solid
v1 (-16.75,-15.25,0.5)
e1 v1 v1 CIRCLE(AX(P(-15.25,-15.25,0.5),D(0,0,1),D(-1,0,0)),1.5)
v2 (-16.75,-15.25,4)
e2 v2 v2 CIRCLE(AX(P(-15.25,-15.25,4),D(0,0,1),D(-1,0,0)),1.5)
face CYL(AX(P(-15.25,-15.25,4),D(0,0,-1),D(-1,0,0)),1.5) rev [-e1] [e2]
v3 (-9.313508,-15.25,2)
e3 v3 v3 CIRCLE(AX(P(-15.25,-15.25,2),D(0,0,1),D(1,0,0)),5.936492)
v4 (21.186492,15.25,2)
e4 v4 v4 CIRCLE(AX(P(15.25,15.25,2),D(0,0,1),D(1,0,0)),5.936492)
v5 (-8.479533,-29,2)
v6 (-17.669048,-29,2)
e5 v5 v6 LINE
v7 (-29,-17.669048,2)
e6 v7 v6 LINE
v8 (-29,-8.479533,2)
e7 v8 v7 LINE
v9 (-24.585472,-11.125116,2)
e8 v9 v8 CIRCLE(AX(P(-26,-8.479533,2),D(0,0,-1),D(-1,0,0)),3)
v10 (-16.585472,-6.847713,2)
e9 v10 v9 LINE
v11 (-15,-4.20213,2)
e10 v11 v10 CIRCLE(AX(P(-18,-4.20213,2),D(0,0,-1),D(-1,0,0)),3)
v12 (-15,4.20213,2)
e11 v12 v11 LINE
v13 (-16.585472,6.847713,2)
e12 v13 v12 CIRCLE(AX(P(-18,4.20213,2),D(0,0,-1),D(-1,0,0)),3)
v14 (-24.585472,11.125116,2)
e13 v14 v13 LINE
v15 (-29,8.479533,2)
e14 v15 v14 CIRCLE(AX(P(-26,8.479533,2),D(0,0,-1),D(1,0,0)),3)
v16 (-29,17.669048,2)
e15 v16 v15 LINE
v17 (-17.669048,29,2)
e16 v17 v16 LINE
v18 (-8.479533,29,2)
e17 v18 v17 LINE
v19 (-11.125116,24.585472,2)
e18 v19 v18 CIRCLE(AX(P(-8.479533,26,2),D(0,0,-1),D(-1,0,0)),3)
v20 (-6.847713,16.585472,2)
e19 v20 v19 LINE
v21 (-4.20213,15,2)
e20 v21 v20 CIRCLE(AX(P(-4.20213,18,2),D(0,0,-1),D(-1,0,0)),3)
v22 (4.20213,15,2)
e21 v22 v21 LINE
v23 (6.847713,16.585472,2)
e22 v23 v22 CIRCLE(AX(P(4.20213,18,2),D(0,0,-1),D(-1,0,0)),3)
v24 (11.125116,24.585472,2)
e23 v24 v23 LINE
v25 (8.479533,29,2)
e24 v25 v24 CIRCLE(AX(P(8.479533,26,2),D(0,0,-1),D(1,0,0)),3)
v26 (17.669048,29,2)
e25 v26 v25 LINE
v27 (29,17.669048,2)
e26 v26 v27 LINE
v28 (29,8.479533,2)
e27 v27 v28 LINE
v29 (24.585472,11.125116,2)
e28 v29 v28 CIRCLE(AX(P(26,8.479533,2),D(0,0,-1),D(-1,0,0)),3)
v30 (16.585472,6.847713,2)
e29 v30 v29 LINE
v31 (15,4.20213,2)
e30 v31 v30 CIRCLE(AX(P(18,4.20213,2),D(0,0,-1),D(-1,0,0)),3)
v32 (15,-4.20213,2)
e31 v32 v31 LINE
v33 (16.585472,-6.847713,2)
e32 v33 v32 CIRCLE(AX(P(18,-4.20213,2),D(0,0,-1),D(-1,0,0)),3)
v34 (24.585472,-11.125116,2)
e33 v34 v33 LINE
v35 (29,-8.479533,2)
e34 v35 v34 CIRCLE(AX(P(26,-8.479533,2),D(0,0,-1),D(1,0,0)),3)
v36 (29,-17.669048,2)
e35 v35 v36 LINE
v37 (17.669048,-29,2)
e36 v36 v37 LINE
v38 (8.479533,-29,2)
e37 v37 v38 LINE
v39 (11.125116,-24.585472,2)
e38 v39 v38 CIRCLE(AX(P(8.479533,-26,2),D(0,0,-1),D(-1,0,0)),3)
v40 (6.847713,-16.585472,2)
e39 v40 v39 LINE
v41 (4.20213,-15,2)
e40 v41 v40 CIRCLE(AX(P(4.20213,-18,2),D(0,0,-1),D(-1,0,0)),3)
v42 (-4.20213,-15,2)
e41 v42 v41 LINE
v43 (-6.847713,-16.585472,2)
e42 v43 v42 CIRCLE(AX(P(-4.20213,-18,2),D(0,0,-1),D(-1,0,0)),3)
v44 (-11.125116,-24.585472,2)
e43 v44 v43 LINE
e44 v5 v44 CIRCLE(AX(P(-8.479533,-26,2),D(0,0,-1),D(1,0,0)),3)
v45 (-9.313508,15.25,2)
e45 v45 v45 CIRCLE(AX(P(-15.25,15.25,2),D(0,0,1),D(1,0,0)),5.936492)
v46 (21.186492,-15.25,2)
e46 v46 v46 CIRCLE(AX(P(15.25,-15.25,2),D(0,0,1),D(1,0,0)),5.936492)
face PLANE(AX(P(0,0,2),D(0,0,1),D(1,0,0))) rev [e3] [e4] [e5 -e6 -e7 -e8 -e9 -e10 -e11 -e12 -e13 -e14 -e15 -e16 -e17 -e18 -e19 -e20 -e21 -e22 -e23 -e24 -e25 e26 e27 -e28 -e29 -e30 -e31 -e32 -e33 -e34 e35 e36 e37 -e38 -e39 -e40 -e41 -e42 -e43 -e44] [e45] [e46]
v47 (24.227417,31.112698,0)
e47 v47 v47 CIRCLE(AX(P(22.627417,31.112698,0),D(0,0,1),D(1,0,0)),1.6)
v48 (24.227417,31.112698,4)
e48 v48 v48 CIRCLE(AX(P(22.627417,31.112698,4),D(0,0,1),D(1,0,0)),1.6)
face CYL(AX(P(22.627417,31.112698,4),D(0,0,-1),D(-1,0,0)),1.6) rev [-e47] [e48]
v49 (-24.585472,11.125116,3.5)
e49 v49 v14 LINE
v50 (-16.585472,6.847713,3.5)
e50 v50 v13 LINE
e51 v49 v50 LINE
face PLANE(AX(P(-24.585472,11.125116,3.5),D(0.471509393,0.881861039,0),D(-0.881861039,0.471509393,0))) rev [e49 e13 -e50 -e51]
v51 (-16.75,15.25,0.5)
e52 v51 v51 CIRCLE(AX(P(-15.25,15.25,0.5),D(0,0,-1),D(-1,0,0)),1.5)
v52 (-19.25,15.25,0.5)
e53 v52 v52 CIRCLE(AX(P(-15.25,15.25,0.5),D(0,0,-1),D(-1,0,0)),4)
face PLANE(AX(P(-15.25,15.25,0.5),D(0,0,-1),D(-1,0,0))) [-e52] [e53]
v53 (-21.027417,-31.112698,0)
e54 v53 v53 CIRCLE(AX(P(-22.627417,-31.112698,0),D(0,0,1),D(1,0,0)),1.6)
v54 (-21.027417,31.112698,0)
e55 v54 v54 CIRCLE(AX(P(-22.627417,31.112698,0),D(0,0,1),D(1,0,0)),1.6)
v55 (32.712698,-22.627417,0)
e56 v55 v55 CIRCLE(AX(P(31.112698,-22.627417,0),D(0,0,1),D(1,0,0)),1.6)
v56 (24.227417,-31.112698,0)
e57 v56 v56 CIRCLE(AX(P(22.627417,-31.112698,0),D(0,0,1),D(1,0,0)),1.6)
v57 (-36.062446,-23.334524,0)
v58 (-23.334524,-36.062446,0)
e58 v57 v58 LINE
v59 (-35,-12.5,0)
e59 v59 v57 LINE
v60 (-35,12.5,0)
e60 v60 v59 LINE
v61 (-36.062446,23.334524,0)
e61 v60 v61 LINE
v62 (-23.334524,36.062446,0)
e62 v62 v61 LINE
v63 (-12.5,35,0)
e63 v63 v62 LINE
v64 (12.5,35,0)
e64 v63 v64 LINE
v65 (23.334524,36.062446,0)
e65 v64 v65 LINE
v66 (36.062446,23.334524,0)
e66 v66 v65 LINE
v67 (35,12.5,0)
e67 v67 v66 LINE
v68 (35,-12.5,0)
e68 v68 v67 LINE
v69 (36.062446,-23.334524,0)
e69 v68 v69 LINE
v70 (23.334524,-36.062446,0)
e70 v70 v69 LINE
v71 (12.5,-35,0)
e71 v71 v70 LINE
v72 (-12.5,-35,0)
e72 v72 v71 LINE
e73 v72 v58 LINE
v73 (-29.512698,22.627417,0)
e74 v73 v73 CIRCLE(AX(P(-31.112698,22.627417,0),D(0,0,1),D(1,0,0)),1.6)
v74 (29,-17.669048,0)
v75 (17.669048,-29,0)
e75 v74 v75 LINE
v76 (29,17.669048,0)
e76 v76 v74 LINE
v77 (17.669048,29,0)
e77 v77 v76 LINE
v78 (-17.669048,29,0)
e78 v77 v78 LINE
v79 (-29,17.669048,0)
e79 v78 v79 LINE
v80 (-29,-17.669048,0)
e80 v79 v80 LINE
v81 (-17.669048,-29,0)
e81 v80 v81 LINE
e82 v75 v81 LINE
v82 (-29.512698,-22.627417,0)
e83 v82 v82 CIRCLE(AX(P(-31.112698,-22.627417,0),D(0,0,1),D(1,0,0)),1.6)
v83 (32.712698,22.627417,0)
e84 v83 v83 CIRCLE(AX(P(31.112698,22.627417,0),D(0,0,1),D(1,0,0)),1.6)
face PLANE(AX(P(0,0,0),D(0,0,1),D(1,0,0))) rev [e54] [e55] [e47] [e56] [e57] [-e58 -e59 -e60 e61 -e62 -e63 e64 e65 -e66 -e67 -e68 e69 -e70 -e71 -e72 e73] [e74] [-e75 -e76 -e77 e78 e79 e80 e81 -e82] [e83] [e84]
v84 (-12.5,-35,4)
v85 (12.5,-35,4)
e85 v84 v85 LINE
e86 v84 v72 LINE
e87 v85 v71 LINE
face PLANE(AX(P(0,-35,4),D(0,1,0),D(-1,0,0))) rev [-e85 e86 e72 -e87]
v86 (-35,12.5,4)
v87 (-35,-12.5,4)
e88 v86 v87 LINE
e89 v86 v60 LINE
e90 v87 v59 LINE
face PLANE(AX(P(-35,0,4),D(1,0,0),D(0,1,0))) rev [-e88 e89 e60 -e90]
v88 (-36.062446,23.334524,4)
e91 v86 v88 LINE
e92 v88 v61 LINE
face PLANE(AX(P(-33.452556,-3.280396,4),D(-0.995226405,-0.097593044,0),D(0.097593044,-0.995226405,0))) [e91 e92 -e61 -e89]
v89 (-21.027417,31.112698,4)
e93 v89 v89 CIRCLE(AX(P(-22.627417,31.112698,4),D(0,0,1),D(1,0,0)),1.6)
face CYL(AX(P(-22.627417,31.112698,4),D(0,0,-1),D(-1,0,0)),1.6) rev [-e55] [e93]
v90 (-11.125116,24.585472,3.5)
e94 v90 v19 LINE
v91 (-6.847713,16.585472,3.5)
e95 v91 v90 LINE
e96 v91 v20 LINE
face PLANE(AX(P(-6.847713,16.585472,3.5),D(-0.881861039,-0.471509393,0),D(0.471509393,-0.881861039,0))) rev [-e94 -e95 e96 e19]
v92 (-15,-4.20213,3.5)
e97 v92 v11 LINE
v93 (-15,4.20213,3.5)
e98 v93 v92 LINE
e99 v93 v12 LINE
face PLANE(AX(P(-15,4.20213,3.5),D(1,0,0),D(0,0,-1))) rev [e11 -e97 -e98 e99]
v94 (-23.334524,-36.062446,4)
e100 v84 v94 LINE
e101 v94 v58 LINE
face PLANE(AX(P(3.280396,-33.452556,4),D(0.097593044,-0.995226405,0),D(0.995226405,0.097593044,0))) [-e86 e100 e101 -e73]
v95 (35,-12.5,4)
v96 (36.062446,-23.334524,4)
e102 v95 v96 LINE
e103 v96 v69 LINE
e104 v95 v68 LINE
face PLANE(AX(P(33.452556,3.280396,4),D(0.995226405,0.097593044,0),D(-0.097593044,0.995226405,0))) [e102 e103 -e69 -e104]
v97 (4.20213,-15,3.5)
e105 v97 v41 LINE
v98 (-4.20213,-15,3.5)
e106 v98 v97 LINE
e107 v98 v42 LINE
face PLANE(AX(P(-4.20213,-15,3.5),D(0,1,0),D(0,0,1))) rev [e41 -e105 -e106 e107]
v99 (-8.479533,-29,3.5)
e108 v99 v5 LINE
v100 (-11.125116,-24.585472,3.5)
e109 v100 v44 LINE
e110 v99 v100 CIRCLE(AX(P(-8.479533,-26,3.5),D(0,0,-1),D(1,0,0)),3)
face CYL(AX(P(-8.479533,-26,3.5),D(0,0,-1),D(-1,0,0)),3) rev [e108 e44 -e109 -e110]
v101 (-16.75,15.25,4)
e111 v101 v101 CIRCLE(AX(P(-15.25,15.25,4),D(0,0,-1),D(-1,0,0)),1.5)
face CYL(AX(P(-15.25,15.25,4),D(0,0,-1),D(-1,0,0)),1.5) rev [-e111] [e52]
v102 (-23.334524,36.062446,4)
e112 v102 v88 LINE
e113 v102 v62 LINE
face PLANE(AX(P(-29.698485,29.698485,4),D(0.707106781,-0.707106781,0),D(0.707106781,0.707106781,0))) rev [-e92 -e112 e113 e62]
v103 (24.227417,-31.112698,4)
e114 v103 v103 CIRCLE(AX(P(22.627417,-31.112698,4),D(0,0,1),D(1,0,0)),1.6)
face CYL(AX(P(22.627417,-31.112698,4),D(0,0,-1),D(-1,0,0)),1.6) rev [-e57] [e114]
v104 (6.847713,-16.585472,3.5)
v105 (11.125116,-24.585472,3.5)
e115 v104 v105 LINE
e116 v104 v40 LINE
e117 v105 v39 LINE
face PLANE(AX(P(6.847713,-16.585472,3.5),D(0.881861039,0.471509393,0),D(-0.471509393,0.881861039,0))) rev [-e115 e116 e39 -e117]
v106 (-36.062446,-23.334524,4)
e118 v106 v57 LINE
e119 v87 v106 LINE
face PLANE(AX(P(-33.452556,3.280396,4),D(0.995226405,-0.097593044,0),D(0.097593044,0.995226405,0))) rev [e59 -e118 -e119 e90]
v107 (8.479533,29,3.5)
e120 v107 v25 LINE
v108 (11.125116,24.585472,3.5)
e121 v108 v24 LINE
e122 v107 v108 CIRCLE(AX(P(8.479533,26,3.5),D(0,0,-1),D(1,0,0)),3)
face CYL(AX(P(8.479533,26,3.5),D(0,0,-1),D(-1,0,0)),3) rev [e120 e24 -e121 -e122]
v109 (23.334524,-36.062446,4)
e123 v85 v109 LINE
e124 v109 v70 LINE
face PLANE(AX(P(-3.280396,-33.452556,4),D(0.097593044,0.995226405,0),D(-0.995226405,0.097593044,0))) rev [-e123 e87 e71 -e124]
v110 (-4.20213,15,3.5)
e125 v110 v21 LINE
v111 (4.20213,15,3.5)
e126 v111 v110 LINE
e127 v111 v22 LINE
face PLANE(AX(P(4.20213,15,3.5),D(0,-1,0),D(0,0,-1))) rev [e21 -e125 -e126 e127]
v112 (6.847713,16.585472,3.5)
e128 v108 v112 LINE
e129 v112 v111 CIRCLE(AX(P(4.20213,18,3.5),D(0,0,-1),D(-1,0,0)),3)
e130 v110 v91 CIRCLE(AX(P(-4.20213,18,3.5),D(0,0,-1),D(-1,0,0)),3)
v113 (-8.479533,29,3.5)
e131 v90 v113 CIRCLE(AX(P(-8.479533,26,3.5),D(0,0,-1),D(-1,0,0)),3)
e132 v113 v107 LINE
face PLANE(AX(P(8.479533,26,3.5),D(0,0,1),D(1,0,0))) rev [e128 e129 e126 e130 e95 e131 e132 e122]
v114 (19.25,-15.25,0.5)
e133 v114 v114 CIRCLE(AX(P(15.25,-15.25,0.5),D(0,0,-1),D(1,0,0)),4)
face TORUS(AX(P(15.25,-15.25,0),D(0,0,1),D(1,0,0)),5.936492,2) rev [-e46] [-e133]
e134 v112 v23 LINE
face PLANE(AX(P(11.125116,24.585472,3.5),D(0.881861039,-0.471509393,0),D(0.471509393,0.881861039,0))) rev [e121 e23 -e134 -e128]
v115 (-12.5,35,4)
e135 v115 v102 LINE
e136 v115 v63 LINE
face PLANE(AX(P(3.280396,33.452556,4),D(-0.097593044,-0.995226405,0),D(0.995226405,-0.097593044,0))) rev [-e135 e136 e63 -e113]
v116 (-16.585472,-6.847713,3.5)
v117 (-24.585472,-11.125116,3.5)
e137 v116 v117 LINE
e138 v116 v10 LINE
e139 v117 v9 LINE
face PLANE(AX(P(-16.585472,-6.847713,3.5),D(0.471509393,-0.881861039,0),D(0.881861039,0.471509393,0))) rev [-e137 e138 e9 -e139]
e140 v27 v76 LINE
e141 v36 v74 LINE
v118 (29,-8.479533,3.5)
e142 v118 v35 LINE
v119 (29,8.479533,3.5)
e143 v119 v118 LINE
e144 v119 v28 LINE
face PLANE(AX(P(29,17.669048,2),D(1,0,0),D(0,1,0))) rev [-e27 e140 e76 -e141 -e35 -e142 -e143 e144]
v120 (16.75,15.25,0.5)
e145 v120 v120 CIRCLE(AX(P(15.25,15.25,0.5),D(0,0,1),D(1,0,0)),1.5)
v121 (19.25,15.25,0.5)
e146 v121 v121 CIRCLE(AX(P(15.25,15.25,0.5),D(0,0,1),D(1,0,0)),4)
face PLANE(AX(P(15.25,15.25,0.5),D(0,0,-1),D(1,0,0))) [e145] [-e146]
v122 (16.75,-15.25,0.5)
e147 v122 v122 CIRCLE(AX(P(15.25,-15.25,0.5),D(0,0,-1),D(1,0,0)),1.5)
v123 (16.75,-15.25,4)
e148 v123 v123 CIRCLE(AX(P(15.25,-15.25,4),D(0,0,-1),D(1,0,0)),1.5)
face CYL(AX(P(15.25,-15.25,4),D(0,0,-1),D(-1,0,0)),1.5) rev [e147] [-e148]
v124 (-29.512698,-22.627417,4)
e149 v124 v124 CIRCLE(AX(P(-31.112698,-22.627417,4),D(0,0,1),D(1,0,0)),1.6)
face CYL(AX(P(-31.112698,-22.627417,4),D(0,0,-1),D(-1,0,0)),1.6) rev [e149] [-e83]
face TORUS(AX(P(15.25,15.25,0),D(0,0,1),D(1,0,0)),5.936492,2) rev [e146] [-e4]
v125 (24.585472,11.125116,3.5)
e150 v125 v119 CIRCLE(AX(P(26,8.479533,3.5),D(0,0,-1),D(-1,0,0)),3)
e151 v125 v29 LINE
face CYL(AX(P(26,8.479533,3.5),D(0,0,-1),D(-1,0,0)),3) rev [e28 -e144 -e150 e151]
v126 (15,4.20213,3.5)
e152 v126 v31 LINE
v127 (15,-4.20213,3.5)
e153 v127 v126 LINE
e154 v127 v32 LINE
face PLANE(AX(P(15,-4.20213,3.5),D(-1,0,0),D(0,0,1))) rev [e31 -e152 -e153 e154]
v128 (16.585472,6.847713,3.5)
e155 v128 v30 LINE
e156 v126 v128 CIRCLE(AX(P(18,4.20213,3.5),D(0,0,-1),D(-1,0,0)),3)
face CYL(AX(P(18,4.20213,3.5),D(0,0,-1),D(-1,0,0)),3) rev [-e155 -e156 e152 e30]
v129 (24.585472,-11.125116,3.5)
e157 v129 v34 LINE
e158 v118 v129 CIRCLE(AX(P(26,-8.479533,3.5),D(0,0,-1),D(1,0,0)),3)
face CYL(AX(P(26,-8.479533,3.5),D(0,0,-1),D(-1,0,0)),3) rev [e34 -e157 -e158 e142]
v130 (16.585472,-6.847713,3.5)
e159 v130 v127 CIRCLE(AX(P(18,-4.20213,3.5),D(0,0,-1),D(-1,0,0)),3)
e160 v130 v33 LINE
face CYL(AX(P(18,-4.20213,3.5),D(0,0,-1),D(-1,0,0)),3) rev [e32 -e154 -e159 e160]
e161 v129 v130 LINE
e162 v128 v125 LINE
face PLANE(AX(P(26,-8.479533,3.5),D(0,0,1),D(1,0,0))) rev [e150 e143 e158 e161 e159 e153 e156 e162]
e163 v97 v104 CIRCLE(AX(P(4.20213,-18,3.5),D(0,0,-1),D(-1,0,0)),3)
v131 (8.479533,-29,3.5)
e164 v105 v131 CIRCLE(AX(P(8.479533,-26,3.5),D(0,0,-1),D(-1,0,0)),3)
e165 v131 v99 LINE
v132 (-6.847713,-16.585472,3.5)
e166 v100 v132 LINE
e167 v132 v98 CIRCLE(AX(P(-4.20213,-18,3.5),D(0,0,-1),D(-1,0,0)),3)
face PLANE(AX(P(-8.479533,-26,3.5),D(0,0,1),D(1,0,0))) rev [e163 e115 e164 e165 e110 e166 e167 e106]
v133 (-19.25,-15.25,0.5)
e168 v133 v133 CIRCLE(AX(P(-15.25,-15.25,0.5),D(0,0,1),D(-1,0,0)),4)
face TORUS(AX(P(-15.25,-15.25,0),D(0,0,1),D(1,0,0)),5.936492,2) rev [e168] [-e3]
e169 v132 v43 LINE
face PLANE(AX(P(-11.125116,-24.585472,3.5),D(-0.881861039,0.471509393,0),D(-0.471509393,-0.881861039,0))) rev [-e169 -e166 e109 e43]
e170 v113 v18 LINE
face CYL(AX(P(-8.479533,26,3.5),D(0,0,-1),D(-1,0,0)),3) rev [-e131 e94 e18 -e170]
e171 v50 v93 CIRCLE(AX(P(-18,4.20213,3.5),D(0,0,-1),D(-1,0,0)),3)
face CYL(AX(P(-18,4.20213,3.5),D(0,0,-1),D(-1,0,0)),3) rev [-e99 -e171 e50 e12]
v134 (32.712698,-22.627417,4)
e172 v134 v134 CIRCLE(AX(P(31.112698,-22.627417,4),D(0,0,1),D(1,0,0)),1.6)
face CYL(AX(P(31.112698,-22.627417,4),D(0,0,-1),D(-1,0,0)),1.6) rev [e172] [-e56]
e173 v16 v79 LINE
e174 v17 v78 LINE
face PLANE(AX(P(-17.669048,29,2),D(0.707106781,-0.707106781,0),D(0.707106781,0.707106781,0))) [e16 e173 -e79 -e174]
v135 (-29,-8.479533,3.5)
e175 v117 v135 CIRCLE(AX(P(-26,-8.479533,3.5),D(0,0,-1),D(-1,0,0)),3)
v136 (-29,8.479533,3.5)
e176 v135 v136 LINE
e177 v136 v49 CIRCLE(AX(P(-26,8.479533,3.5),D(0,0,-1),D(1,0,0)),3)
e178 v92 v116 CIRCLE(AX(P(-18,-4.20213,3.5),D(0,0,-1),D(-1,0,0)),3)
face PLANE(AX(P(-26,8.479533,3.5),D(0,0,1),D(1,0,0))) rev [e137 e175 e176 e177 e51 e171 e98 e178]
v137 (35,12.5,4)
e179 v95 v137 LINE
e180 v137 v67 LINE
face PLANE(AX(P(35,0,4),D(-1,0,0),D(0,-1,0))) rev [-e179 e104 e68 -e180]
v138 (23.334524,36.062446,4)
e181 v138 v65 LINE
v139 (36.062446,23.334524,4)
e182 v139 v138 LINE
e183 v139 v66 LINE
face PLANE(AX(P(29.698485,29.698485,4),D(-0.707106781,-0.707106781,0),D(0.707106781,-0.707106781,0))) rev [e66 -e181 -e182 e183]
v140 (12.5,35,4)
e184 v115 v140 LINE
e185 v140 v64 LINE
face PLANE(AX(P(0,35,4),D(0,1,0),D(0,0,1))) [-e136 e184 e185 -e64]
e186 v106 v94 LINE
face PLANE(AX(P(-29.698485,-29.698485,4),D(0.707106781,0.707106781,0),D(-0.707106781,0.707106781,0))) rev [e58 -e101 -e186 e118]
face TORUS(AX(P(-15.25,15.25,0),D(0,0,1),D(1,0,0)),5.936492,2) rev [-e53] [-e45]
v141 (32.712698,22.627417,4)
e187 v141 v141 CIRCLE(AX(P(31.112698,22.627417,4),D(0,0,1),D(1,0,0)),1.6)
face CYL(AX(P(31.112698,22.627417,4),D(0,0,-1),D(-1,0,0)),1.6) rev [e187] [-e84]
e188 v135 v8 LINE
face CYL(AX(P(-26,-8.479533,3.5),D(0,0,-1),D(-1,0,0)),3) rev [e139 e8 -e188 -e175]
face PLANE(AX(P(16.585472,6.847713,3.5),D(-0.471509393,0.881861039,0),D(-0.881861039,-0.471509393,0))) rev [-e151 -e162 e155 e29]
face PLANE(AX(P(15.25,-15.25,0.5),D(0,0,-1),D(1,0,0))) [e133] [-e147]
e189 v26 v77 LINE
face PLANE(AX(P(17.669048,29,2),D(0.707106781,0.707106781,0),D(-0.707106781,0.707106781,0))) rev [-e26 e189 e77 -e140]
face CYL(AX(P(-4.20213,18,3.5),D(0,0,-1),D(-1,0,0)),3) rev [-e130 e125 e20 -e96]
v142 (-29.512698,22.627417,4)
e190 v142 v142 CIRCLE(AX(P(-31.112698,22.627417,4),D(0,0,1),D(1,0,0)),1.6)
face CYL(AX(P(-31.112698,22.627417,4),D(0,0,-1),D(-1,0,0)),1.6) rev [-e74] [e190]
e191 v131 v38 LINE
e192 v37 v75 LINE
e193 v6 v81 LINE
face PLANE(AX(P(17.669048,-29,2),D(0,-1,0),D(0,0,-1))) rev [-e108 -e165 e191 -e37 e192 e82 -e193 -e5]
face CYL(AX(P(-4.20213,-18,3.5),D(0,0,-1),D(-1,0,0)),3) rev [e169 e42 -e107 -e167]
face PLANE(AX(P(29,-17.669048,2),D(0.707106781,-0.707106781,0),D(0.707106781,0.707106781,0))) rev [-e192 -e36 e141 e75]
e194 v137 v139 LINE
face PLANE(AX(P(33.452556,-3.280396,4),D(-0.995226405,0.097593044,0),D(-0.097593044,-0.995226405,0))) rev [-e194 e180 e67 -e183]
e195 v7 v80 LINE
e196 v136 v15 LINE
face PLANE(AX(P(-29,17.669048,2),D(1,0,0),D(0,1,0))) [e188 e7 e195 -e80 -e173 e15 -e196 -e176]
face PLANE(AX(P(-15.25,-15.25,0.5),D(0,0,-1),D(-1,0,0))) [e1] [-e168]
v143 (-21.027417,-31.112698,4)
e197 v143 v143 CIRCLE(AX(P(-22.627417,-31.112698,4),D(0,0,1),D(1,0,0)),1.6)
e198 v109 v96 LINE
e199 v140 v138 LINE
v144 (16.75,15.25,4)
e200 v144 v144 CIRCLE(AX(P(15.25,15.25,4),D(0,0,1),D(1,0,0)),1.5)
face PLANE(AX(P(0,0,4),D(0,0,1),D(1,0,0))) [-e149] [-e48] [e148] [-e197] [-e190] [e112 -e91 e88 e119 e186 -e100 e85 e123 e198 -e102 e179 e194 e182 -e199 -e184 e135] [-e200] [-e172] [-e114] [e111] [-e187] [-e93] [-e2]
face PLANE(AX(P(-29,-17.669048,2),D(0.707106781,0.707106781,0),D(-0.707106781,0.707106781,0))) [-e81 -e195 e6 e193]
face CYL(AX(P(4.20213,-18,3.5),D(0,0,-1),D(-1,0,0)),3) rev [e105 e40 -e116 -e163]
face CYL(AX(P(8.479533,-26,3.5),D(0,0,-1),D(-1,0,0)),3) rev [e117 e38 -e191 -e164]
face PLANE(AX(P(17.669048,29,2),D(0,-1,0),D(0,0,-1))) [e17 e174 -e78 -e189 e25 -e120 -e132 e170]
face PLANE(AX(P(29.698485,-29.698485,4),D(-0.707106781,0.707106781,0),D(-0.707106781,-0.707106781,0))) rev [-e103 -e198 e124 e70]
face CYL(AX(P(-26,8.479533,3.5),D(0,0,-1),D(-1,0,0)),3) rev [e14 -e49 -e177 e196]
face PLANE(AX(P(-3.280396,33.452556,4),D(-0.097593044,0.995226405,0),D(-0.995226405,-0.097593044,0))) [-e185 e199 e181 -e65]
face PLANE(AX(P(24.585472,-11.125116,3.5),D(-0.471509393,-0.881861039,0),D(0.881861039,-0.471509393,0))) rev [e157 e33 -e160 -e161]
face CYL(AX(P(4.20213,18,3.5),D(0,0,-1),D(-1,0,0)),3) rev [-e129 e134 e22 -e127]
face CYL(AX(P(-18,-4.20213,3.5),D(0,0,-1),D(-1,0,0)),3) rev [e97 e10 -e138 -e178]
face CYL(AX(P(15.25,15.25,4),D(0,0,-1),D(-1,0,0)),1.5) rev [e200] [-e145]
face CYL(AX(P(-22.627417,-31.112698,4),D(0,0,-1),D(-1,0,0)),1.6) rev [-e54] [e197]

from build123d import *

# Parameters (mm, degrees)
SKETCH1_R            = 1.6
BOSS_EXTRUDE1_DEPTH  = 4
CUT_EXTRUDE1_DEPTH   = 2
CUT_EXTRUDE2_DEPTH   = 1.5
SKETCH4_R            = 1.5
CUT_EXTRUDE3_DEPTH   = 52.039200621
BOSS_EXTRUDE2_START  = 1.5
SKETCH5_R            = 4
SKETCH5_R_2          = 1.5
BOSS_EXTRUDE2_DEPTH  = 1.5
FILLET1_R            = 2
FILLET1_OF_MIRROR1_R = 2
MIRROR2_3_OUTLINE_W  = 1.5
MIRROR2_3_OUTLINE_H  = 2
MIRROR2_4_OUTLINE_W  = 1.5
MIRROR2_4_OUTLINE_H  = 2


# Read off the part's stored shape, not the designer's step: Mirror2
with BuildPart() as part:
    # Sketch1 → Boss-Extrude1 (new body)
    with BuildSketch(Plane.XY):
        Polygon((-35, 12.5), (-36.062445841, 23.334523779), (-23.334523779, 36.062445841), (-12.5, 35), (12.5, 35), (23.334523779, 36.062445841), (36.062445841, 23.334523779), (35, 12.5), (35, -12.5), (36.062445841, -23.334523779), (23.334523779, -36.062445841), (12.5, -35), (-12.5, -35), (-23.334523779, -36.062445841), (-36.062445841, -23.334523779), (-35, -12.5), align=None)
        with Locations((-22.627416998, 31.112698372)):
            Circle(SKETCH1_R, mode=Mode.SUBTRACT)
        with Locations((-31.112698372, 22.627416998)):
            Circle(SKETCH1_R, mode=Mode.SUBTRACT)
        with Locations((-31.112698372, -22.627416998)):
            Circle(SKETCH1_R, mode=Mode.SUBTRACT)
        with Locations((-22.627416998, -31.112698372)):
            Circle(SKETCH1_R, mode=Mode.SUBTRACT)
        with Locations((22.627416998, -31.112698372)):
            Circle(SKETCH1_R, mode=Mode.SUBTRACT)
        with Locations((31.112698372, -22.627416998)):
            Circle(SKETCH1_R, mode=Mode.SUBTRACT)
        with Locations((31.112698372, 22.627416998)):
            Circle(SKETCH1_R, mode=Mode.SUBTRACT)
        with Locations((22.627416998, 31.112698372)):
            Circle(SKETCH1_R, mode=Mode.SUBTRACT)
    extrude(amount=BOSS_EXTRUDE1_DEPTH)

    # Sketch2 → Cut-Extrude1 (cut)
    with BuildSketch(Plane(origin=(0, 0, 0), x_dir=(-1, 0, 0), z_dir=(0, 0, -1))):
        Polygon((-17.669047558, 29), (17.669047558, 29), (29, 17.669047558), (29, -17.669047558), (17.669047558, -29), (-17.669047558, -29), (-29, -17.669047558), (-29, 17.669047558), align=None)
    extrude(amount=-CUT_EXTRUDE1_DEPTH, mode=Mode.SUBTRACT)

    # Sketch3 → Cut-Extrude2 (cut)
    with BuildSketch(Plane(origin=(0, 0, 2), x_dir=(-1, 0, 0), z_dir=(0, 0, -1))):
        with BuildLine():
            Line((-24.58547182, -11.125115865), (-16.58547182, -6.847712761))
            ThreePointArc((-16.58547182, -6.847712761), (-15.426715665, -5.744273519), (-15, -4.202129644))
            Line((-15, -4.202129644), (-15, 4.202129644))
            ThreePointArc((-15, 4.202129644), (-15.426715665, 5.744273519), (-16.58547182, 6.847712761))
            Line((-16.58547182, 6.847712761), (-24.58547182, 11.125115865))
            ThreePointArc((-24.58547182, 11.125115865), (-27.542143875, 11.052817083), (-29, 8.479532748))
            Line((-29, 8.479532748), (-29, -8.479532748))
            ThreePointArc((-29, -8.479532748), (-27.542143875, -11.052817083), (-24.58547182, -11.125115865))
        make_face()
        with BuildLine():
            Line((6.847712761, 16.58547182), (11.125115865, 24.58547182))
            ThreePointArc((11.125115865, 24.58547182), (11.052817083, 27.542143875), (8.479532748, 29))
            Line((8.479532748, 29), (-8.479532748, 29))
            ThreePointArc((-8.479532748, 29), (-11.052817083, 27.542143875), (-11.125115865, 24.58547182))
            Line((-11.125115865, 24.58547182), (-6.847712761, 16.58547182))
            ThreePointArc((-6.847712761, 16.58547182), (-5.744273519, 15.426715665), (-4.202129644, 15))
            Line((-4.202129644, 15), (4.202129644, 15))
            ThreePointArc((4.202129644, 15), (5.744273519, 15.426715665), (6.847712761, 16.58547182))
        make_face()
        with BuildLine():
            Line((16.58547182, -6.847712761), (24.58547182, -11.125115865))
            ThreePointArc((24.58547182, -11.125115865), (27.542143875, -11.052817083), (29, -8.479532748))
            Line((29, -8.479532748), (29, 8.479532748))
            ThreePointArc((29, 8.479532748), (27.542143875, 11.052817083), (24.58547182, 11.125115865))
            Line((24.58547182, 11.125115865), (16.58547182, 6.847712761))
            ThreePointArc((16.58547182, 6.847712761), (15.426715665, 5.744273519), (15, 4.202129644))
            Line((15, 4.202129644), (15, -4.202129644))
            ThreePointArc((15, -4.202129644), (15.426715665, -5.744273519), (16.58547182, -6.847712761))
        make_face()
        with BuildLine():
            Line((-6.847712761, -16.58547182), (-11.125115865, -24.58547182))
            ThreePointArc((-11.125115865, -24.58547182), (-11.052817083, -27.542143875), (-8.479532748, -29))
            Line((-8.479532748, -29), (8.479532748, -29))
            ThreePointArc((8.479532748, -29), (11.052817083, -27.542143875), (11.125115865, -24.58547182))
            Line((11.125115865, -24.58547182), (6.847712761, -16.58547182))
            ThreePointArc((6.847712761, -16.58547182), (5.744273519, -15.426715665), (4.202129644, -15))
            Line((4.202129644, -15), (-4.202129644, -15))
            ThreePointArc((-4.202129644, -15), (-5.744273519, -15.426715665), (-6.847712761, -16.58547182))
        make_face()
    extrude(amount=-CUT_EXTRUDE2_DEPTH, mode=Mode.SUBTRACT)

    # Sketch4 → Cut-Extrude3 (cut, through all)
    with BuildSketch(Plane(origin=(0, 0, 2), x_dir=(-1, 0, 0), z_dir=(0, 0, -1))):
        with Locations((15.25, 15.25)):
            Circle(SKETCH4_R)
    cut_extrude3 = extrude(amount=-CUT_EXTRUDE3_DEPTH, mode=Mode.SUBTRACT)

    # Sketch5 → Boss-Extrude2 (add)
    with BuildSketch(Plane(origin=(0, 0, 2), x_dir=(-1, 0, 0), z_dir=(0, 0, -1)).offset(BOSS_EXTRUDE2_START)):
        with Locations(Location((15.25, 15.25, 0), (0, 0, 180))):
            Circle(SKETCH5_R)
        with Locations((15.25, 15.25)):
            Circle(SKETCH5_R_2, mode=Mode.SUBTRACT)
    boss_extrude2 = extrude(amount=-BOSS_EXTRUDE2_DEPTH)

    # Fillet1
    # the kernel refuses this fillet: 2 mm, written as the material it adds along each edge
    with BuildSketch(Plane(origin=(-15.25, 15.25, 2), x_dir=(1, 0, 0), z_dir=(0, 1, 0))) as fillet1_piece_1:
        with BuildLine():
            CenterArc((5.936491673, 2), FILLET1_R, 194.477512186, 75.522487814)
            Line((5.936491673, 0), (5.936491673, -0.04))
            Line((5.936491673, -0.04), (4, -0.04))
            Line((4, -0.04), (3.96, 0))
            ThreePointArc((3.96, 0), (3.96, 0.75), (3.961270167, 1.49))
            Line((3.961270167, 1.49), (4, 1.5))
        make_face()
    revolve(axis=Axis((-15.25, 15.25, 2), (0, 0, -1)))

    # Mirror1: Cut-Extrude3, Boss-Extrude2 across plane
    add(cut_extrude3.mirror(Plane(origin=(0, 0, 0), x_dir=(0, 0, 1), z_dir=(1, 0, 0))), mode=Mode.SUBTRACT)
    add(boss_extrude2.mirror(Plane(origin=(0, 0, 0), x_dir=(0, 0, 1), z_dir=(1, 0, 0))))

    # Fillet1 of Mirror1
    # the kernel refuses this fillet: 2 mm, written as the material it adds along each edge
    with BuildSketch(Plane(origin=(15.25, 15.25, 2), x_dir=(-1, 0, 0), z_dir=(0, 1, 0))) as fillet1_of_mirror1_piece_1:
        with BuildLine():
            CenterArc((5.936491673, -2), FILLET1_OF_MIRROR1_R, 90, 75.522487814)
            Line((5.936491673, 0), (5.936491673, 0.04))
            Line((5.936491673, 0.04), (4, 0.04))
            Line((4, 0.04), (3.96, 0))
            ThreePointArc((3.96, 0), (3.96, -0.75), (3.961270167, -1.49))
            Line((3.961270167, -1.49), (4, -1.5))
        make_face()
    revolve(axis=Axis((15.25, 15.25, 2), (0, 0, 1)))

    # Mirror2 outline → Mirror2 (revolve)
    with BuildSketch(Plane(origin=(15.25, -15.25, 0), x_dir=(1, 0, 0), z_dir=(0, -1, 0))):
        with BuildLine():
            Line((1.5, 2), (1.5, 0.5))
            Line((1.5, 0.5), (4, 0.5))
            ThreePointArc((4, 0.5), (4.711746802, 1.58113883), (5.936491673, 2))
            Line((5.936491673, 2), (1.5, 2))
        make_face()
    revolve(axis=Axis((15.25, -15.25, 0), (0, 0, 1)))

    # Mirror2 2 outline → Mirror2 2 (revolve)
    with BuildSketch(Plane(origin=(-15.25, -15.25, 0), x_dir=(1, 0, 0), z_dir=(0, -1, 0))):
        with BuildLine():
            Line((1.5, 2), (1.5, 0.5))
            Line((1.5, 0.5), (4, 0.5))
            ThreePointArc((4, 0.5), (4.711746802, 1.58113883), (5.936491673, 2))
            Line((5.936491673, 2), (1.5, 2))
        make_face()
    revolve(axis=Axis((-15.25, -15.25, 0), (0, 0, 1)))

    # Mirror2 3 outline → Mirror2 3 (revolve, cut)
    with BuildSketch(Plane(origin=(15.25, -15.25, 0), x_dir=(1, 0, 0), z_dir=(0, -1, 0))):
        with Locations((0.75, 3)):
            Rectangle(MIRROR2_3_OUTLINE_W, MIRROR2_3_OUTLINE_H)
    revolve(axis=Axis((15.25, -15.25, 0), (0, 0, 1)), mode=Mode.SUBTRACT)

    # Mirror2 4 outline → Mirror2 4 (revolve, cut)
    with BuildSketch(Plane(origin=(-15.25, -15.25, 0), x_dir=(1, 0, 0), z_dir=(0, -1, 0))):
        with Locations((0.75, 3)):
            Rectangle(MIRROR2_4_OUTLINE_W, MIRROR2_4_OUTLINE_H)
    revolve(axis=Axis((-15.25, -15.25, 0), (0, 0, 1)), mode=Mode.SUBTRACT)


solid = part.part
